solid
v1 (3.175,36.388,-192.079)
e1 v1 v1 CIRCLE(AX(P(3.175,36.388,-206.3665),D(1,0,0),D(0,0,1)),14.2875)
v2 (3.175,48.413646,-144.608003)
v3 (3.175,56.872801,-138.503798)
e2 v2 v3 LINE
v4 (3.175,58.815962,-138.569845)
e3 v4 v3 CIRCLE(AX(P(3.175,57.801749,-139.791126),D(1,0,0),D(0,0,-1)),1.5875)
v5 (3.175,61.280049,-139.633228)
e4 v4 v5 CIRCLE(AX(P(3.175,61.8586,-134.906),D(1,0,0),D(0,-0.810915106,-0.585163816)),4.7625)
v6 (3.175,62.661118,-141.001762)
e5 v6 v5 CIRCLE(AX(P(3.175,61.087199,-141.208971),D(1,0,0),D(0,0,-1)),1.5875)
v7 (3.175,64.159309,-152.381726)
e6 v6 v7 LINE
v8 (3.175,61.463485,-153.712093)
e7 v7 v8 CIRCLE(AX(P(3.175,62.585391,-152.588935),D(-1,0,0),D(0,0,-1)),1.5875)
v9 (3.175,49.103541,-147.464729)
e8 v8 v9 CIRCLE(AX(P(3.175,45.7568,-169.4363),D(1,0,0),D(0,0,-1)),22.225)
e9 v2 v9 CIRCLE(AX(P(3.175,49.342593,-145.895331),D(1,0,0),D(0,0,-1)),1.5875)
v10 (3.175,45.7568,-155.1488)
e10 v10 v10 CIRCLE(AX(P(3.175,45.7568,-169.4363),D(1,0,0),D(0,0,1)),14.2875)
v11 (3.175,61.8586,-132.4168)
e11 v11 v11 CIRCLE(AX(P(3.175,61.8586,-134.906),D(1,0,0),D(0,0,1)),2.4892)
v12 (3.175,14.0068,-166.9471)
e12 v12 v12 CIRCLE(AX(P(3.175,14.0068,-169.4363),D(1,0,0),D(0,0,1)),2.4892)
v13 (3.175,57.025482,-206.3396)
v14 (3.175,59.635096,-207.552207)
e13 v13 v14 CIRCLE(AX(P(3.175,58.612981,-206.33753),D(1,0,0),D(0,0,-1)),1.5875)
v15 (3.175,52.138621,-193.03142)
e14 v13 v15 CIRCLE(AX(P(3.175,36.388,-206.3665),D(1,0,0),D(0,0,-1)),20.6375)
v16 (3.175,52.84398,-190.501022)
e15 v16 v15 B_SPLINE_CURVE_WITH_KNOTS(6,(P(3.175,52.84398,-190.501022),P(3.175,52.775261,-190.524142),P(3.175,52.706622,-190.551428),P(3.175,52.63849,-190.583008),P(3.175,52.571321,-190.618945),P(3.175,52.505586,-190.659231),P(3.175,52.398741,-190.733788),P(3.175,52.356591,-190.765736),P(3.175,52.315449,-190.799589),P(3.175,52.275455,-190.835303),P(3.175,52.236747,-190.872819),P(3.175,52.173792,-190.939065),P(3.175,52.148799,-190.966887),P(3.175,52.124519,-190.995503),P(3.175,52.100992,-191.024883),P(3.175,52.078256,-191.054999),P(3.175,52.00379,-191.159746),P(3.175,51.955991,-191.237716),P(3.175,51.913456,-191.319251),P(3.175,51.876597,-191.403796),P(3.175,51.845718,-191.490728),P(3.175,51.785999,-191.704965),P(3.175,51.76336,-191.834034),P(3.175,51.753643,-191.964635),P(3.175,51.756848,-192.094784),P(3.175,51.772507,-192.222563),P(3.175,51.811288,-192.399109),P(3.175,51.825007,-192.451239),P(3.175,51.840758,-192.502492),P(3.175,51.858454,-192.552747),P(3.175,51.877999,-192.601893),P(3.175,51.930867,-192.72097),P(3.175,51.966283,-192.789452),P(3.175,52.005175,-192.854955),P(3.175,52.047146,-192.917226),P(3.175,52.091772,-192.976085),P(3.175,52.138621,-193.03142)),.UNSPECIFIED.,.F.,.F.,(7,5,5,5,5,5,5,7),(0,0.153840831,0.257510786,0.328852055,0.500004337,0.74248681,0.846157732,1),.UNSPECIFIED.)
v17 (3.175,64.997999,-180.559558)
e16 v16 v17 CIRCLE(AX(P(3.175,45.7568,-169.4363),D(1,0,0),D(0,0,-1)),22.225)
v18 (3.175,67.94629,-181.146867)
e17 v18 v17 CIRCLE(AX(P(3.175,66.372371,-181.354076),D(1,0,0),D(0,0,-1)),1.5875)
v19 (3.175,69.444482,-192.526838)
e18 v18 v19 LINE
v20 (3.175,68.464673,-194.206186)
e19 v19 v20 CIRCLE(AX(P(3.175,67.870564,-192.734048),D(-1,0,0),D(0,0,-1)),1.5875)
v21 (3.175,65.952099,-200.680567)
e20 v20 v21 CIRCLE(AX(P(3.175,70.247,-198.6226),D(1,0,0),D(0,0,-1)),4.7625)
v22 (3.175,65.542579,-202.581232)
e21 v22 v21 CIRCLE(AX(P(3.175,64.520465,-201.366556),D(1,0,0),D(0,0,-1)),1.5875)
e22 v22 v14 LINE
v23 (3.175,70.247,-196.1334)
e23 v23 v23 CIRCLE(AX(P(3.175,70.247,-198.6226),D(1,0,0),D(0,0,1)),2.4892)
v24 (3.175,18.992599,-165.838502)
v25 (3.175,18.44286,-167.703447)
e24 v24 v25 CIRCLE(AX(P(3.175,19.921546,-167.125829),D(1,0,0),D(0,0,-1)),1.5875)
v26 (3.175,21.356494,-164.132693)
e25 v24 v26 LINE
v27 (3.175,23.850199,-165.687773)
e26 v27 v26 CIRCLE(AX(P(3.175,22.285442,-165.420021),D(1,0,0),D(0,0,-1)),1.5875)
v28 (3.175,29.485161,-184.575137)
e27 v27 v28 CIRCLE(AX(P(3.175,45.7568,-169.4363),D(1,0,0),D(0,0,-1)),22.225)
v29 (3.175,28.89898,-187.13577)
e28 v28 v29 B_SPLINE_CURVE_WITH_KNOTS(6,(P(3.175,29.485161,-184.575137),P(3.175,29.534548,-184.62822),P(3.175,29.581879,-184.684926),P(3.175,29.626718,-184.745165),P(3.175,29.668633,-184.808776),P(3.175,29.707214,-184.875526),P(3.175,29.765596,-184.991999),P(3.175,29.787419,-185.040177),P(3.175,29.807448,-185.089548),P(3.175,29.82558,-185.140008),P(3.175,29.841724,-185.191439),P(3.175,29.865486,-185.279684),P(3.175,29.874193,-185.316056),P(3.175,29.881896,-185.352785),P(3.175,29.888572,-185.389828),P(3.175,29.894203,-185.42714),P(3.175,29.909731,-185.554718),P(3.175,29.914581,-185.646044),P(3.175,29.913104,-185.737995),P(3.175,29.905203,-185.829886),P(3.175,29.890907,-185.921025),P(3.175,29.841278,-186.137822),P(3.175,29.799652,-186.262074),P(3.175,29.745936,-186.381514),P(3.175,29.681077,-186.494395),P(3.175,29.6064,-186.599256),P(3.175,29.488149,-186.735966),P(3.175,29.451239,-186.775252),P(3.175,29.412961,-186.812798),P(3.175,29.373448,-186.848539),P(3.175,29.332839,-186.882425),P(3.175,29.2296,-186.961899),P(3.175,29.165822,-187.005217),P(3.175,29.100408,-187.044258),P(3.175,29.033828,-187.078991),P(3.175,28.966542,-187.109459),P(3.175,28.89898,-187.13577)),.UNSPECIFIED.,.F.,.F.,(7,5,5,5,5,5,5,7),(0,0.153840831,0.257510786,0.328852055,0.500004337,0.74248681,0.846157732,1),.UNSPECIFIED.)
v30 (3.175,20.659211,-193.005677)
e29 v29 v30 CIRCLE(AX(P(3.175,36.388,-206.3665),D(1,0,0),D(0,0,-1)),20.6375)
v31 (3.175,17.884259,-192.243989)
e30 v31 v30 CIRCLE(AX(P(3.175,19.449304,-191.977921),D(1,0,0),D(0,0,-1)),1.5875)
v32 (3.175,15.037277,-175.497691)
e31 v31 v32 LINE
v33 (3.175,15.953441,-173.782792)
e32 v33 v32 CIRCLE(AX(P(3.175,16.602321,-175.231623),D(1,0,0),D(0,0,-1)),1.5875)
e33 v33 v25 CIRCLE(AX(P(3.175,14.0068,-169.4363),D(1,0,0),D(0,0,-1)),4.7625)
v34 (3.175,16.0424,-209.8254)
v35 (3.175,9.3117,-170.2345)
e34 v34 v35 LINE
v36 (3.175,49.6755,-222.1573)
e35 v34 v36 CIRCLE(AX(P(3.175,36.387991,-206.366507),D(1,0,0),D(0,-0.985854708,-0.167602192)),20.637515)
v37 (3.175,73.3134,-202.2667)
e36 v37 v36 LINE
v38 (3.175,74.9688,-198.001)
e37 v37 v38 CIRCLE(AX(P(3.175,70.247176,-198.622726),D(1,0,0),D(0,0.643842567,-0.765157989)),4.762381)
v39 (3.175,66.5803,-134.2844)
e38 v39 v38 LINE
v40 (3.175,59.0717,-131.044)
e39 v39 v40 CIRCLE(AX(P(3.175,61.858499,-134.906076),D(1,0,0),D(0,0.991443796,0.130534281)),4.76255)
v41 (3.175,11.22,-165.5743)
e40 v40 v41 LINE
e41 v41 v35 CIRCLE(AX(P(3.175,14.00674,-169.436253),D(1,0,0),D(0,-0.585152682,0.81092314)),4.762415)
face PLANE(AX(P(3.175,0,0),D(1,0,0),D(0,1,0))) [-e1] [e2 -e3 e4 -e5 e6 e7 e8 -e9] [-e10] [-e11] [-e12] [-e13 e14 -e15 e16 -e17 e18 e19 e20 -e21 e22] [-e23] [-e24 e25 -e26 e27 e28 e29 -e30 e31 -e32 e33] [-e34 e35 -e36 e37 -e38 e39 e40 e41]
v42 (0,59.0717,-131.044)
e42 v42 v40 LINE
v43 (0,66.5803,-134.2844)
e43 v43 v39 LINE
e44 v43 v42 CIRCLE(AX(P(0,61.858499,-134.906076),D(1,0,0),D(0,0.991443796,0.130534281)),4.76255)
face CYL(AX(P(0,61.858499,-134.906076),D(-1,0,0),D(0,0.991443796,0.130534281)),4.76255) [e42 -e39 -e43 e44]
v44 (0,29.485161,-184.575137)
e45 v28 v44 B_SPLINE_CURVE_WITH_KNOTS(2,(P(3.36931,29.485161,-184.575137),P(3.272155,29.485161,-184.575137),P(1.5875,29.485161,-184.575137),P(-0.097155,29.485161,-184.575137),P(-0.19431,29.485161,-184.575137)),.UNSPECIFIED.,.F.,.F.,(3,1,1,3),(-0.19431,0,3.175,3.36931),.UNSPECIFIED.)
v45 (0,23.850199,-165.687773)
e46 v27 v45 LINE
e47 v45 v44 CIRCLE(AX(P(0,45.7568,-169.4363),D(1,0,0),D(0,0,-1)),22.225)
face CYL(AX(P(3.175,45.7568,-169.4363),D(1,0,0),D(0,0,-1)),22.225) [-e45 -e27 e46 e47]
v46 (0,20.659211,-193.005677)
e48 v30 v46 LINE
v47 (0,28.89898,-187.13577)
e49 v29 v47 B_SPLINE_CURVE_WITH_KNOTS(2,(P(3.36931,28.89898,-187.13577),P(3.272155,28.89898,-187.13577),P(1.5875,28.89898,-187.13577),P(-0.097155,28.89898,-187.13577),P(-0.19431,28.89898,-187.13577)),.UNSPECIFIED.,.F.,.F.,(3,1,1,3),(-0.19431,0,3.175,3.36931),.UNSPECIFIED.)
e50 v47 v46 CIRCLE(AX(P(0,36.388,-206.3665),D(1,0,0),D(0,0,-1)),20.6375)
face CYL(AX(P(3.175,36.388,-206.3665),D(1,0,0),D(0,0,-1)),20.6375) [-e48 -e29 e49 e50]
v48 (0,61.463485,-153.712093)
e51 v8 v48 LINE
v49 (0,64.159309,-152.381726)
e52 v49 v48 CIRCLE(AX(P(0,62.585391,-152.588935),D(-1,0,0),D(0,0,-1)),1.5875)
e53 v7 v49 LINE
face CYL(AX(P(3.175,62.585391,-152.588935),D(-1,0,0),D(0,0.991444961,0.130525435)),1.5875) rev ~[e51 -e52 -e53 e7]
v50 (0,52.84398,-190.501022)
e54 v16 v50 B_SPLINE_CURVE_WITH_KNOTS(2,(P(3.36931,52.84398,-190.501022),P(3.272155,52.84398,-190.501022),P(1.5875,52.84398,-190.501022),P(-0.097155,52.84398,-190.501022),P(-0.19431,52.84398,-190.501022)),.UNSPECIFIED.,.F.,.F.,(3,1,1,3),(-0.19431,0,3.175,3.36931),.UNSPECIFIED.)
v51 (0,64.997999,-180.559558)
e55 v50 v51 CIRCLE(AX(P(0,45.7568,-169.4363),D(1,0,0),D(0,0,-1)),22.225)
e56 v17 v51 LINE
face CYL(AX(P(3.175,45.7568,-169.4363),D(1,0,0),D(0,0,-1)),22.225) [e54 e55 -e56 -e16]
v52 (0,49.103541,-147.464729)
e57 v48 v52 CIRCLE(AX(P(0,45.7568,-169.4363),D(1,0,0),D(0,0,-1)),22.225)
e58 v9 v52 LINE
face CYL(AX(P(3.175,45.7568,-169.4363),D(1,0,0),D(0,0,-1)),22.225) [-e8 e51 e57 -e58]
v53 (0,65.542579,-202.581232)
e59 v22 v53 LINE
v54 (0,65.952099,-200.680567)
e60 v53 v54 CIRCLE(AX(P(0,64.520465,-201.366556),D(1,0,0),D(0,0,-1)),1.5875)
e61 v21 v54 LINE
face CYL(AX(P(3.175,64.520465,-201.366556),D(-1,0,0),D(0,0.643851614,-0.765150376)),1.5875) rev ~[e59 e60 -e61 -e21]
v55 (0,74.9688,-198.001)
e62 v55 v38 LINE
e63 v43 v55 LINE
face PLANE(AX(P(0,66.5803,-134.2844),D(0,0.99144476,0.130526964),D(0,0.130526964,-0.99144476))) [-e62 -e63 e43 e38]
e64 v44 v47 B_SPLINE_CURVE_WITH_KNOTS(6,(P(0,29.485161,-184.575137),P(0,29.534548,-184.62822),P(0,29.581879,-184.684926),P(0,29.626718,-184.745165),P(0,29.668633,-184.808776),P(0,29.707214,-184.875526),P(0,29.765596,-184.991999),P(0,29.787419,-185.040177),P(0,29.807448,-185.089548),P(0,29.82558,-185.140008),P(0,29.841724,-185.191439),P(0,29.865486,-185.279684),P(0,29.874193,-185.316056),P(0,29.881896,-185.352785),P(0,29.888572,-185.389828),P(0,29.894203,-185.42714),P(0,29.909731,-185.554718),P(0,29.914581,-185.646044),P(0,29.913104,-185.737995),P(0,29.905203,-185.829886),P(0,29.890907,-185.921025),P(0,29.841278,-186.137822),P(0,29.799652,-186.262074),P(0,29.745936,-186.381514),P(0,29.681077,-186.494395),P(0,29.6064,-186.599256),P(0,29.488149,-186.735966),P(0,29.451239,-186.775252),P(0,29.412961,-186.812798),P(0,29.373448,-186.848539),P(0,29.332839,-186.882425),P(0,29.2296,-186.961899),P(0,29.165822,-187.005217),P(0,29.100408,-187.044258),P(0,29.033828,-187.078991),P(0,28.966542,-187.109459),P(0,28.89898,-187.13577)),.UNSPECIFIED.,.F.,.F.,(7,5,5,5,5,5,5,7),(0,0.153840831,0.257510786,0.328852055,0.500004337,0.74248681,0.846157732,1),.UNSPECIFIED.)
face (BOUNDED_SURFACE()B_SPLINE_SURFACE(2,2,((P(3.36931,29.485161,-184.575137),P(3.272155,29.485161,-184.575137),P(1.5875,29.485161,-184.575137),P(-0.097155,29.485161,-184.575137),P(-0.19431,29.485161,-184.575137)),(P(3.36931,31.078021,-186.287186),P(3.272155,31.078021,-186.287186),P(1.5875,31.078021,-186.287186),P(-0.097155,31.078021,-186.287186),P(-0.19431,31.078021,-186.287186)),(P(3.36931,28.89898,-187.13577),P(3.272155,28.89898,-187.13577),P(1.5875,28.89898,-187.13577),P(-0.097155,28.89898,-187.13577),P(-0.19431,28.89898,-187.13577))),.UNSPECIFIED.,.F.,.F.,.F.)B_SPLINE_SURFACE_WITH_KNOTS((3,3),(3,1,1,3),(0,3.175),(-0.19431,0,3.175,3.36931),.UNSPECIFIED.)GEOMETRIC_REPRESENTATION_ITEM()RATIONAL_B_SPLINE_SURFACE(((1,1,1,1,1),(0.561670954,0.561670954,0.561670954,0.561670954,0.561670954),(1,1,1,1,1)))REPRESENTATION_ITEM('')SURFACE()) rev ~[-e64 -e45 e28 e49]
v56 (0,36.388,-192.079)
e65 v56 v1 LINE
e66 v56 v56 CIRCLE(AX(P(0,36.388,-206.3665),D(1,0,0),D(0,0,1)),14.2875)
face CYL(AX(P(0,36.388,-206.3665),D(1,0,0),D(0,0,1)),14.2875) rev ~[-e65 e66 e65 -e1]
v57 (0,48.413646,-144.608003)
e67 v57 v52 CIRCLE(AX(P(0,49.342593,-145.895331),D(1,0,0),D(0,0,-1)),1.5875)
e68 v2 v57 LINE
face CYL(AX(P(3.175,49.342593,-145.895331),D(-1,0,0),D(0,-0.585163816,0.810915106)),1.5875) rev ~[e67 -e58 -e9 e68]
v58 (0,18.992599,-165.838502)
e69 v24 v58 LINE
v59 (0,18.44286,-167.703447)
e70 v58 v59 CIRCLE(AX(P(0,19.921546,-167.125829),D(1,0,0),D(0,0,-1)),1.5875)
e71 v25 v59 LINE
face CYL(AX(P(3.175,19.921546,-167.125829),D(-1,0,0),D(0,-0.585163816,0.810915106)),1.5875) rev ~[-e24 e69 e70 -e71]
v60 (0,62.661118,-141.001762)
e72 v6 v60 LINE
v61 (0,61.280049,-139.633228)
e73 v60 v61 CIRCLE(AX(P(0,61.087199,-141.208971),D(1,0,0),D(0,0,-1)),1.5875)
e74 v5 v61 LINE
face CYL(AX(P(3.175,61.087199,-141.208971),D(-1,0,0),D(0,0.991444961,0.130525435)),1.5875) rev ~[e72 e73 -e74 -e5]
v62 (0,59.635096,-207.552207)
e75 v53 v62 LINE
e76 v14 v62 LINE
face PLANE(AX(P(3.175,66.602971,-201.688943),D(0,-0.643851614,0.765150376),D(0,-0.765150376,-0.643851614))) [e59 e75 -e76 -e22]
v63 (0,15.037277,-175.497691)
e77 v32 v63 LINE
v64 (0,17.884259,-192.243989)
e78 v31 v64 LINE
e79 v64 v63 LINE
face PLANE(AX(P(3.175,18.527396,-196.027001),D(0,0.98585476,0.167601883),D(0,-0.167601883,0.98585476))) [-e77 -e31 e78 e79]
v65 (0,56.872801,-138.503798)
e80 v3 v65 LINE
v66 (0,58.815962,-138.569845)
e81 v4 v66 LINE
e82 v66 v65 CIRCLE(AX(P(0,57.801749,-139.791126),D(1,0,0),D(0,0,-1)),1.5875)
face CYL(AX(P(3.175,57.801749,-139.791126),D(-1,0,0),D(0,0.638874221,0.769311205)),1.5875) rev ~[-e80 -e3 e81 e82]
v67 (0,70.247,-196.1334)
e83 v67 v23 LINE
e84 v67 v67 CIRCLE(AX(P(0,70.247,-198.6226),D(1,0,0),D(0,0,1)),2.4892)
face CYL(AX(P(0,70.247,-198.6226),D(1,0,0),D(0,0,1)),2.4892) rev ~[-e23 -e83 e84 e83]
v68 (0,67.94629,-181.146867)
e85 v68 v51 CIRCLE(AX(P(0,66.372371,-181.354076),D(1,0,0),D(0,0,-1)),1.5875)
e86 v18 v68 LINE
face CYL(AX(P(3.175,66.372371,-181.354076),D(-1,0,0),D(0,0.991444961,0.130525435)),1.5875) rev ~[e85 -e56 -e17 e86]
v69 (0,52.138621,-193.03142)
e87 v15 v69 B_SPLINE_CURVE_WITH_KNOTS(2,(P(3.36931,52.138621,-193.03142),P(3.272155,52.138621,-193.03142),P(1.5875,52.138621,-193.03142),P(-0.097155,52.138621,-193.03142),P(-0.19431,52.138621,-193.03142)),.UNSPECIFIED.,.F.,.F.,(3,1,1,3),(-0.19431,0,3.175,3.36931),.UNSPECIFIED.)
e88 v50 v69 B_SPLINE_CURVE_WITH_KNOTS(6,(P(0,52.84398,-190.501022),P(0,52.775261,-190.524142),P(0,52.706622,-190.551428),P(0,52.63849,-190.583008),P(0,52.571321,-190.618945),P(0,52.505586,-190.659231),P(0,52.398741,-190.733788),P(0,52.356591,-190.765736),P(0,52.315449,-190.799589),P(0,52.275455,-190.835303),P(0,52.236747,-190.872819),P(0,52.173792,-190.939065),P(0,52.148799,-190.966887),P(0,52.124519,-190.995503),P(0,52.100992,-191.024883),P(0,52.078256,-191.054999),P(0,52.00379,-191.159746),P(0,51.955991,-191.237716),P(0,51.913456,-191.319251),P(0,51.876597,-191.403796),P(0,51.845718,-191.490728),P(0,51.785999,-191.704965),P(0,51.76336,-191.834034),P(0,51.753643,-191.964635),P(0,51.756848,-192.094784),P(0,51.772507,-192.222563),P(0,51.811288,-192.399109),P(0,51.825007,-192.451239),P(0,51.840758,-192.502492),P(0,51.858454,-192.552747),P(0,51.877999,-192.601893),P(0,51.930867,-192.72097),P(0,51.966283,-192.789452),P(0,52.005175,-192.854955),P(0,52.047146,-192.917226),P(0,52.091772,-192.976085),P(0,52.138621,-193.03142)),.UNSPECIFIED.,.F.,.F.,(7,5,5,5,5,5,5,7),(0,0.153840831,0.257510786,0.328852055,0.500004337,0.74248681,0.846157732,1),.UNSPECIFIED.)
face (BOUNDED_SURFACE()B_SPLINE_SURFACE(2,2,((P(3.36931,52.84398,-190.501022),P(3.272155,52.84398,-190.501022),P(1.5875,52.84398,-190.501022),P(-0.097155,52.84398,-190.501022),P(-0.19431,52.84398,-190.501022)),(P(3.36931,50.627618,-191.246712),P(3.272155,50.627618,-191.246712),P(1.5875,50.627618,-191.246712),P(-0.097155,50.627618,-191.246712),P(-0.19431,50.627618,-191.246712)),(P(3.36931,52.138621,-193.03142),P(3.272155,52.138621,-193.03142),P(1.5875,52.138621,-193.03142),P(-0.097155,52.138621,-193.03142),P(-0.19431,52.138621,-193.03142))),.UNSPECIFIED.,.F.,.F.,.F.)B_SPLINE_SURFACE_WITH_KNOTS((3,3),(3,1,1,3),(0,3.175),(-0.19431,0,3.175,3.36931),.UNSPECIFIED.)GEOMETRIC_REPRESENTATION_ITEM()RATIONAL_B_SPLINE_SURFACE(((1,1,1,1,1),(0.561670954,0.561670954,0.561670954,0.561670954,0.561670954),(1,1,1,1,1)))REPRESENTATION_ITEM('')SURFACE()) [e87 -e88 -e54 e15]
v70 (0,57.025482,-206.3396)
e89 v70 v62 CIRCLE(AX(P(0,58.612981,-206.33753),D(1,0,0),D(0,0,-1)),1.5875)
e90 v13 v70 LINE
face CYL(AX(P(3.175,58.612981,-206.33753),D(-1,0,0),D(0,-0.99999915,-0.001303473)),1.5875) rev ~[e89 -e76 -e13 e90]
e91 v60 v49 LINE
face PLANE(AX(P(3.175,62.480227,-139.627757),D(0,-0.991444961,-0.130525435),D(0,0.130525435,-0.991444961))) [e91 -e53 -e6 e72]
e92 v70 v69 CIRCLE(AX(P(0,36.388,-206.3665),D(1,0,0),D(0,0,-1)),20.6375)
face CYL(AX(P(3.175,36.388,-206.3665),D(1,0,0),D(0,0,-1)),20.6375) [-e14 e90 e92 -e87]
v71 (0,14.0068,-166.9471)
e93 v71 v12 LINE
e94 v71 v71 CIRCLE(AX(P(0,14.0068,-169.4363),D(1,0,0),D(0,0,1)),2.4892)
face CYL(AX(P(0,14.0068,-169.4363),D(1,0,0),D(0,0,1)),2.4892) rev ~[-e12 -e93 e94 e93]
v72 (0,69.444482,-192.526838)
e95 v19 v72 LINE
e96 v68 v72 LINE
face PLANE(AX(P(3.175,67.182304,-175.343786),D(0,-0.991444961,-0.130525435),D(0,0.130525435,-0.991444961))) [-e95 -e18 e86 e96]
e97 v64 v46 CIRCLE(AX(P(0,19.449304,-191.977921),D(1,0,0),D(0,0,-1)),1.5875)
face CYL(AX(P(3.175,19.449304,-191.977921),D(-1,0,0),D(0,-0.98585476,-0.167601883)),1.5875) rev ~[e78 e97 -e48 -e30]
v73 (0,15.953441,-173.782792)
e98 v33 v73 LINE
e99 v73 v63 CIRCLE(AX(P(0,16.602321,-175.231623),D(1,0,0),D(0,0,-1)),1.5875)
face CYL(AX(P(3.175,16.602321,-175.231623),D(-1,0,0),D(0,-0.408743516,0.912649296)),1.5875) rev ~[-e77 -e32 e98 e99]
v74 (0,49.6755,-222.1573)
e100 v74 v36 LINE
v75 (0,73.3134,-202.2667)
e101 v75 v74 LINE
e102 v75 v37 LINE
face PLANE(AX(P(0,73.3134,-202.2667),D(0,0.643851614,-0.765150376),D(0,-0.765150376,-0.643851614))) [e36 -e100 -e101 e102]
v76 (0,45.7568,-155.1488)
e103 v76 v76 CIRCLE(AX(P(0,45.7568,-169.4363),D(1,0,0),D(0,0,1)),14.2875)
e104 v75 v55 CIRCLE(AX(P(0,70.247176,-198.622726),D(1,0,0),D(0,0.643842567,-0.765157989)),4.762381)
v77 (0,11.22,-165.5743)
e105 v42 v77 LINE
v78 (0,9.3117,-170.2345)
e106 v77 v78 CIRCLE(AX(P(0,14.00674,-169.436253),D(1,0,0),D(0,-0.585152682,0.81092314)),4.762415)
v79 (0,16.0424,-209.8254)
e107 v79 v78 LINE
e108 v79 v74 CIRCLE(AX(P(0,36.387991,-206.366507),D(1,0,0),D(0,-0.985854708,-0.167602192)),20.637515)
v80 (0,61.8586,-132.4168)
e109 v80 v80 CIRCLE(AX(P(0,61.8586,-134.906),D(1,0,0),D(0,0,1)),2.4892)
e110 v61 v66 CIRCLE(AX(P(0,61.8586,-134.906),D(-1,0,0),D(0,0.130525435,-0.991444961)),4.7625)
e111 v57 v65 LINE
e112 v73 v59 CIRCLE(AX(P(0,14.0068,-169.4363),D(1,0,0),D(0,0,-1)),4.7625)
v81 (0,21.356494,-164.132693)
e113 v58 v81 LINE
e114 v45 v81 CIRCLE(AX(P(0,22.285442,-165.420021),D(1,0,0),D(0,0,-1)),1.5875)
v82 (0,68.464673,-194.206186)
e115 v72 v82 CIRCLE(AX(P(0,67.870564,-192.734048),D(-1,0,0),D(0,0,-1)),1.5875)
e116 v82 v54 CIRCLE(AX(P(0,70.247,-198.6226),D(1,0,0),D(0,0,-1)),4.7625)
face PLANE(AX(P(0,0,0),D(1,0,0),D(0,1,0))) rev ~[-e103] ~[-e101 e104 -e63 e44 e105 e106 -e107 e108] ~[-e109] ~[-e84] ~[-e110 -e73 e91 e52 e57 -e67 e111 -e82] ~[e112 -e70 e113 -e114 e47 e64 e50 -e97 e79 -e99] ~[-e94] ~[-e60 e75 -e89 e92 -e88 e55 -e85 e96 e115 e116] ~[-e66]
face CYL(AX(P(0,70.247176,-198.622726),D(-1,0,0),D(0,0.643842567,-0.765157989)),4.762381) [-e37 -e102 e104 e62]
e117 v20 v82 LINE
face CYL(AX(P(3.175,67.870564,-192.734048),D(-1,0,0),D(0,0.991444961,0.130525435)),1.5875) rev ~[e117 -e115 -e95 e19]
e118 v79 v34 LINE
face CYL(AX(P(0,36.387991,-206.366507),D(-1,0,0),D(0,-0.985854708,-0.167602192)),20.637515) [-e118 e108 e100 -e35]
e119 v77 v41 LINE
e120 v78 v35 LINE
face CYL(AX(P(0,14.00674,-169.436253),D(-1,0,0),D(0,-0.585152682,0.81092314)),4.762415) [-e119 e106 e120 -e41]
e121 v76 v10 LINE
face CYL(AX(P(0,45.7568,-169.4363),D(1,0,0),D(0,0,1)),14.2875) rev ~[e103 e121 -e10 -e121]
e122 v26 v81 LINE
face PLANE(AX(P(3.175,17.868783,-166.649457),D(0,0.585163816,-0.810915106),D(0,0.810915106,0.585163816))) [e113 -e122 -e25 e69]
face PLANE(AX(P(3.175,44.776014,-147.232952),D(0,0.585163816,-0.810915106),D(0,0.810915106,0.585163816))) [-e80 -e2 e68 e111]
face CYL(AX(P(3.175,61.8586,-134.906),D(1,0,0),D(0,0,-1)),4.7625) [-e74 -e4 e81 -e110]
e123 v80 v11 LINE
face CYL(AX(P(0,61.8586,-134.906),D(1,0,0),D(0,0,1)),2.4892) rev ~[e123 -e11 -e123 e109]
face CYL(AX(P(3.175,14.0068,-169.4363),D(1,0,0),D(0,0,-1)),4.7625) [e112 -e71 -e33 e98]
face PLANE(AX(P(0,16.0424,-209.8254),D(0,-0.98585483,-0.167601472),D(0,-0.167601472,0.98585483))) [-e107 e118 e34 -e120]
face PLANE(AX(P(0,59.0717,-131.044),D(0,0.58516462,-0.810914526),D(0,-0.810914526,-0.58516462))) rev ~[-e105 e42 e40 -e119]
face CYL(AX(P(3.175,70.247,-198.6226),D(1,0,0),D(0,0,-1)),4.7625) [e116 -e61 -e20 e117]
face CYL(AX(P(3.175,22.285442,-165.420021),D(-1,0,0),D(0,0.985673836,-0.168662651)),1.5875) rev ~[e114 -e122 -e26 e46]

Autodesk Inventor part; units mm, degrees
ref_plane "YZ Plane" through (0, 0, 0) normal (1, 0, 0) x (0, 1, 0)
ref_plane "XZ Plane" through (0, 0, 0) normal (0, 1, 0) x (-1, 0, 0)
ref_plane "XY Plane" through (0, 0, 0) normal (0, 0, 1) x (1, 0, 0)
sketch "Sketch1" plane through (0, 0, 0) normal (1, 0, 0) x (0, 1, 0)
  line L0 (0, -278.2902) -> (0, 46.3817) construction
  line L1 (36.388, -206.3665) -> (0, 0) construction
  arc A0 (16.0424, -209.8254) -> (49.6755, -222.1573) centre (36.388, -206.3665) ccw
  line L2 (61.8586, -134.906) -> (45.7568, -169.4363) construction
  arc A1 (66.5803, -134.2844) -> (59.0717, -131.044) centre (61.8586, -134.906) ccw
  arc A2 (73.3134, -202.2667) -> (74.9688, -198.001) centre (70.247, -198.6226) ccw
  arc A3 (11.22, -165.5743) -> (9.3117, -170.2345) centre (14.0068, -169.4363) ccw
  line L3 (66.5803, -134.2844) -> (74.9688, -198.001)
  line L4 (73.3134, -202.2667) -> (49.6755, -222.1573)
  line L5 (16.0424, -209.8254) -> (9.3117, -170.2345)
  line L6 (70.247, -198.6226) -> (45.7568, -169.4363) construction
  line L7 (59.0717, -131.044) -> (11.22, -165.5743)
  line L8 (45.7568, -169.4363) -> (14.0068, -169.4363) construction
  dimension "d8" = 209.55
  dimension "d9" = 175.506
  dimension "d11" = 10
  dimension "d12" = 20.6375
  dimension "d13" = 38.1
  dimension "d14" = 25
  dimension "d19" = 4.7625
  dimension "d37" = 40
  dimension "d39" = 90
  dimension "d40" = 31.75
  dimension "d41" = 38.1
extrude "Plate1" add sketch "Sketch1" along normal blind 3.175
hole "Hole1" at (0, 61.8586, -134.906) at (0, 14.0068, -169.4363) at (0, 70.247, -198.6226) direction (1, 0, 0) diameter 4.9784 end through all clearance for "Flat Head Machine Screw (82)" size "#10" standard "Ansi Unified Screw Threads"
hole "Hole2" at (0, 36.388, -206.3665) at (0, 45.7568, -169.4363) direction (1, 0, 0) diameter 28.575 end through all
sketch "Sketch2" plane through (3.175, 0, 0) normal (1, 0, 0) x (0, 0, -1)
  circle A0 centre (169.4363, 45.7568) radius 14.2875 projected
  circle A1 centre (206.3665, 36.388) radius 14.2875 projected
  circle A2 centre (198.6226, 70.247) radius 2.4892 projected
  circle A3 centre (169.4363, 14.0068) radius 2.4892 projected
  circle A4 centre (134.906, 61.8586) radius 2.4892 projected
  arc A5 (134.2844, 66.5803) -> (131.044, 59.0717) centre (134.906, 61.8586) ccw projected
  line L0 (165.5743, 11.22) -> (131.044, 59.0717) projected
  arc A6 (165.5743, 11.22) -> (170.2345, 9.3117) centre (169.4363, 14.0068) ccw projected
  line L1 (209.8254, 16.0424) -> (170.2345, 9.3117) projected
  arc A7 (209.8254, 16.0424) -> (222.1573, 49.6755) centre (206.3665, 36.388) ccw projected
  line L2 (202.2667, 73.3134) -> (222.1573, 49.6755) projected
  arc A8 (202.2667, 73.3134) -> (198.001, 74.9688) centre (198.6226, 70.247) ccw projected
  line L3 (134.2844, 66.5803) -> (198.001, 74.9688) projected
  line L4 (134.906, 61.8586) -> (198.6226, 70.247)
  line L5 (198.6226, 70.247) -> (218.5132, 46.6091)
  arc A9 (209.0271, 20.7375) -> (218.5132, 46.6091) centre (206.3665, 36.388) ccw
  line L6 (209.0271, 20.7375) -> (169.4363, 14.0068)
  line L7 (169.4363, 14.0068) -> (134.906, 61.8586)
  circle A10 centre (134.906, 61.8586) radius 4.7625
  circle A11 centre (198.6226, 70.247) radius 4.7625
  circle A12 centre (169.4363, 14.0068) radius 4.7625
  circle A13 centre (169.4363, 45.7568) radius 22.225
  circle A14 centre (206.3665, 36.388) radius 20.6375
  point P0 (0, 0)
  point P1 (196.0269, 18.5274)
  point P2 (186.3547, 31.3444)
  point P3 (161.5078, 24.9941)
  point P4 (166.6495, 17.8688)
  point P5 (174.1315, 14.805)
  point P6 (191.1791, 50.3612)
  point P7 (210.0229, 56.699)
  point P8 (201.689, 66.603)
  point P9 (193.9009, 69.6254)
  point P10 (175.3438, 67.1823)
  point P11 (147.233, 44.776)
  point P12 (158.1848, 64.9233)
  point P13 (139.6278, 62.4802)
  point P14 (137.6928, 57.9966)
  dimension "d42" = 4.7625
  dimension "d44" = 41.275
  dimension "d45" = 44.45
extrude "Cut1" cut sketch "Sketch2" against normal blind 3.175 contours A11 L5 A14 A13 L4 | A13 L7 A10 L4 | A14 L6 A12 L7 A13
fillet "Corner Round1" radius 1.5875 14 edges at (1.5875, 44.776, -147.233) (1.5875, 64.9233, -158.1848) (1.5875, 57.9966, -137.6928) (1.5875, 56.699, -210.0229) (1.5875, 31.3444, -186.3547) (1.5875, 14.805, -174.1315) (1.5875, 18.5274, -196.0269) (1.5875, 50.3612, -191.1791) (1.5875, 62.4802, -139.6278) (1.5875, 69.6254, -193.9009) (1.5875, 66.603, -201.689) (1.5875, 67.1823, -175.3438) (1.5875, 17.8688, -166.6495) (1.5875, 24.9941, -161.5078)
equation "\"d25\" = Thickness"
equation "\"d46\" = Thickness"
equation "\"d7\" = Thickness"
equation "\"BendRadius\" = Thickness"
equation "\"BendReliefWidth\" = Thickness"
equation "\"BendReliefDepth\" = 0.5 * Thickness"
equation "\"CornerReliefSize\" = 4 * Thickness"
equation "\"MinimumRemnant\" = 2 * Thickness"
equation "\"TransitionRadius\" = BendRadius"
equation "\"JacobiRadiusSize\" = BendRadius"
equation "\"GapSize\" = Thickness"
equation "\"Thickness\" = 3.175"
properties part number "PLATE,BEARING,MOUNT"
